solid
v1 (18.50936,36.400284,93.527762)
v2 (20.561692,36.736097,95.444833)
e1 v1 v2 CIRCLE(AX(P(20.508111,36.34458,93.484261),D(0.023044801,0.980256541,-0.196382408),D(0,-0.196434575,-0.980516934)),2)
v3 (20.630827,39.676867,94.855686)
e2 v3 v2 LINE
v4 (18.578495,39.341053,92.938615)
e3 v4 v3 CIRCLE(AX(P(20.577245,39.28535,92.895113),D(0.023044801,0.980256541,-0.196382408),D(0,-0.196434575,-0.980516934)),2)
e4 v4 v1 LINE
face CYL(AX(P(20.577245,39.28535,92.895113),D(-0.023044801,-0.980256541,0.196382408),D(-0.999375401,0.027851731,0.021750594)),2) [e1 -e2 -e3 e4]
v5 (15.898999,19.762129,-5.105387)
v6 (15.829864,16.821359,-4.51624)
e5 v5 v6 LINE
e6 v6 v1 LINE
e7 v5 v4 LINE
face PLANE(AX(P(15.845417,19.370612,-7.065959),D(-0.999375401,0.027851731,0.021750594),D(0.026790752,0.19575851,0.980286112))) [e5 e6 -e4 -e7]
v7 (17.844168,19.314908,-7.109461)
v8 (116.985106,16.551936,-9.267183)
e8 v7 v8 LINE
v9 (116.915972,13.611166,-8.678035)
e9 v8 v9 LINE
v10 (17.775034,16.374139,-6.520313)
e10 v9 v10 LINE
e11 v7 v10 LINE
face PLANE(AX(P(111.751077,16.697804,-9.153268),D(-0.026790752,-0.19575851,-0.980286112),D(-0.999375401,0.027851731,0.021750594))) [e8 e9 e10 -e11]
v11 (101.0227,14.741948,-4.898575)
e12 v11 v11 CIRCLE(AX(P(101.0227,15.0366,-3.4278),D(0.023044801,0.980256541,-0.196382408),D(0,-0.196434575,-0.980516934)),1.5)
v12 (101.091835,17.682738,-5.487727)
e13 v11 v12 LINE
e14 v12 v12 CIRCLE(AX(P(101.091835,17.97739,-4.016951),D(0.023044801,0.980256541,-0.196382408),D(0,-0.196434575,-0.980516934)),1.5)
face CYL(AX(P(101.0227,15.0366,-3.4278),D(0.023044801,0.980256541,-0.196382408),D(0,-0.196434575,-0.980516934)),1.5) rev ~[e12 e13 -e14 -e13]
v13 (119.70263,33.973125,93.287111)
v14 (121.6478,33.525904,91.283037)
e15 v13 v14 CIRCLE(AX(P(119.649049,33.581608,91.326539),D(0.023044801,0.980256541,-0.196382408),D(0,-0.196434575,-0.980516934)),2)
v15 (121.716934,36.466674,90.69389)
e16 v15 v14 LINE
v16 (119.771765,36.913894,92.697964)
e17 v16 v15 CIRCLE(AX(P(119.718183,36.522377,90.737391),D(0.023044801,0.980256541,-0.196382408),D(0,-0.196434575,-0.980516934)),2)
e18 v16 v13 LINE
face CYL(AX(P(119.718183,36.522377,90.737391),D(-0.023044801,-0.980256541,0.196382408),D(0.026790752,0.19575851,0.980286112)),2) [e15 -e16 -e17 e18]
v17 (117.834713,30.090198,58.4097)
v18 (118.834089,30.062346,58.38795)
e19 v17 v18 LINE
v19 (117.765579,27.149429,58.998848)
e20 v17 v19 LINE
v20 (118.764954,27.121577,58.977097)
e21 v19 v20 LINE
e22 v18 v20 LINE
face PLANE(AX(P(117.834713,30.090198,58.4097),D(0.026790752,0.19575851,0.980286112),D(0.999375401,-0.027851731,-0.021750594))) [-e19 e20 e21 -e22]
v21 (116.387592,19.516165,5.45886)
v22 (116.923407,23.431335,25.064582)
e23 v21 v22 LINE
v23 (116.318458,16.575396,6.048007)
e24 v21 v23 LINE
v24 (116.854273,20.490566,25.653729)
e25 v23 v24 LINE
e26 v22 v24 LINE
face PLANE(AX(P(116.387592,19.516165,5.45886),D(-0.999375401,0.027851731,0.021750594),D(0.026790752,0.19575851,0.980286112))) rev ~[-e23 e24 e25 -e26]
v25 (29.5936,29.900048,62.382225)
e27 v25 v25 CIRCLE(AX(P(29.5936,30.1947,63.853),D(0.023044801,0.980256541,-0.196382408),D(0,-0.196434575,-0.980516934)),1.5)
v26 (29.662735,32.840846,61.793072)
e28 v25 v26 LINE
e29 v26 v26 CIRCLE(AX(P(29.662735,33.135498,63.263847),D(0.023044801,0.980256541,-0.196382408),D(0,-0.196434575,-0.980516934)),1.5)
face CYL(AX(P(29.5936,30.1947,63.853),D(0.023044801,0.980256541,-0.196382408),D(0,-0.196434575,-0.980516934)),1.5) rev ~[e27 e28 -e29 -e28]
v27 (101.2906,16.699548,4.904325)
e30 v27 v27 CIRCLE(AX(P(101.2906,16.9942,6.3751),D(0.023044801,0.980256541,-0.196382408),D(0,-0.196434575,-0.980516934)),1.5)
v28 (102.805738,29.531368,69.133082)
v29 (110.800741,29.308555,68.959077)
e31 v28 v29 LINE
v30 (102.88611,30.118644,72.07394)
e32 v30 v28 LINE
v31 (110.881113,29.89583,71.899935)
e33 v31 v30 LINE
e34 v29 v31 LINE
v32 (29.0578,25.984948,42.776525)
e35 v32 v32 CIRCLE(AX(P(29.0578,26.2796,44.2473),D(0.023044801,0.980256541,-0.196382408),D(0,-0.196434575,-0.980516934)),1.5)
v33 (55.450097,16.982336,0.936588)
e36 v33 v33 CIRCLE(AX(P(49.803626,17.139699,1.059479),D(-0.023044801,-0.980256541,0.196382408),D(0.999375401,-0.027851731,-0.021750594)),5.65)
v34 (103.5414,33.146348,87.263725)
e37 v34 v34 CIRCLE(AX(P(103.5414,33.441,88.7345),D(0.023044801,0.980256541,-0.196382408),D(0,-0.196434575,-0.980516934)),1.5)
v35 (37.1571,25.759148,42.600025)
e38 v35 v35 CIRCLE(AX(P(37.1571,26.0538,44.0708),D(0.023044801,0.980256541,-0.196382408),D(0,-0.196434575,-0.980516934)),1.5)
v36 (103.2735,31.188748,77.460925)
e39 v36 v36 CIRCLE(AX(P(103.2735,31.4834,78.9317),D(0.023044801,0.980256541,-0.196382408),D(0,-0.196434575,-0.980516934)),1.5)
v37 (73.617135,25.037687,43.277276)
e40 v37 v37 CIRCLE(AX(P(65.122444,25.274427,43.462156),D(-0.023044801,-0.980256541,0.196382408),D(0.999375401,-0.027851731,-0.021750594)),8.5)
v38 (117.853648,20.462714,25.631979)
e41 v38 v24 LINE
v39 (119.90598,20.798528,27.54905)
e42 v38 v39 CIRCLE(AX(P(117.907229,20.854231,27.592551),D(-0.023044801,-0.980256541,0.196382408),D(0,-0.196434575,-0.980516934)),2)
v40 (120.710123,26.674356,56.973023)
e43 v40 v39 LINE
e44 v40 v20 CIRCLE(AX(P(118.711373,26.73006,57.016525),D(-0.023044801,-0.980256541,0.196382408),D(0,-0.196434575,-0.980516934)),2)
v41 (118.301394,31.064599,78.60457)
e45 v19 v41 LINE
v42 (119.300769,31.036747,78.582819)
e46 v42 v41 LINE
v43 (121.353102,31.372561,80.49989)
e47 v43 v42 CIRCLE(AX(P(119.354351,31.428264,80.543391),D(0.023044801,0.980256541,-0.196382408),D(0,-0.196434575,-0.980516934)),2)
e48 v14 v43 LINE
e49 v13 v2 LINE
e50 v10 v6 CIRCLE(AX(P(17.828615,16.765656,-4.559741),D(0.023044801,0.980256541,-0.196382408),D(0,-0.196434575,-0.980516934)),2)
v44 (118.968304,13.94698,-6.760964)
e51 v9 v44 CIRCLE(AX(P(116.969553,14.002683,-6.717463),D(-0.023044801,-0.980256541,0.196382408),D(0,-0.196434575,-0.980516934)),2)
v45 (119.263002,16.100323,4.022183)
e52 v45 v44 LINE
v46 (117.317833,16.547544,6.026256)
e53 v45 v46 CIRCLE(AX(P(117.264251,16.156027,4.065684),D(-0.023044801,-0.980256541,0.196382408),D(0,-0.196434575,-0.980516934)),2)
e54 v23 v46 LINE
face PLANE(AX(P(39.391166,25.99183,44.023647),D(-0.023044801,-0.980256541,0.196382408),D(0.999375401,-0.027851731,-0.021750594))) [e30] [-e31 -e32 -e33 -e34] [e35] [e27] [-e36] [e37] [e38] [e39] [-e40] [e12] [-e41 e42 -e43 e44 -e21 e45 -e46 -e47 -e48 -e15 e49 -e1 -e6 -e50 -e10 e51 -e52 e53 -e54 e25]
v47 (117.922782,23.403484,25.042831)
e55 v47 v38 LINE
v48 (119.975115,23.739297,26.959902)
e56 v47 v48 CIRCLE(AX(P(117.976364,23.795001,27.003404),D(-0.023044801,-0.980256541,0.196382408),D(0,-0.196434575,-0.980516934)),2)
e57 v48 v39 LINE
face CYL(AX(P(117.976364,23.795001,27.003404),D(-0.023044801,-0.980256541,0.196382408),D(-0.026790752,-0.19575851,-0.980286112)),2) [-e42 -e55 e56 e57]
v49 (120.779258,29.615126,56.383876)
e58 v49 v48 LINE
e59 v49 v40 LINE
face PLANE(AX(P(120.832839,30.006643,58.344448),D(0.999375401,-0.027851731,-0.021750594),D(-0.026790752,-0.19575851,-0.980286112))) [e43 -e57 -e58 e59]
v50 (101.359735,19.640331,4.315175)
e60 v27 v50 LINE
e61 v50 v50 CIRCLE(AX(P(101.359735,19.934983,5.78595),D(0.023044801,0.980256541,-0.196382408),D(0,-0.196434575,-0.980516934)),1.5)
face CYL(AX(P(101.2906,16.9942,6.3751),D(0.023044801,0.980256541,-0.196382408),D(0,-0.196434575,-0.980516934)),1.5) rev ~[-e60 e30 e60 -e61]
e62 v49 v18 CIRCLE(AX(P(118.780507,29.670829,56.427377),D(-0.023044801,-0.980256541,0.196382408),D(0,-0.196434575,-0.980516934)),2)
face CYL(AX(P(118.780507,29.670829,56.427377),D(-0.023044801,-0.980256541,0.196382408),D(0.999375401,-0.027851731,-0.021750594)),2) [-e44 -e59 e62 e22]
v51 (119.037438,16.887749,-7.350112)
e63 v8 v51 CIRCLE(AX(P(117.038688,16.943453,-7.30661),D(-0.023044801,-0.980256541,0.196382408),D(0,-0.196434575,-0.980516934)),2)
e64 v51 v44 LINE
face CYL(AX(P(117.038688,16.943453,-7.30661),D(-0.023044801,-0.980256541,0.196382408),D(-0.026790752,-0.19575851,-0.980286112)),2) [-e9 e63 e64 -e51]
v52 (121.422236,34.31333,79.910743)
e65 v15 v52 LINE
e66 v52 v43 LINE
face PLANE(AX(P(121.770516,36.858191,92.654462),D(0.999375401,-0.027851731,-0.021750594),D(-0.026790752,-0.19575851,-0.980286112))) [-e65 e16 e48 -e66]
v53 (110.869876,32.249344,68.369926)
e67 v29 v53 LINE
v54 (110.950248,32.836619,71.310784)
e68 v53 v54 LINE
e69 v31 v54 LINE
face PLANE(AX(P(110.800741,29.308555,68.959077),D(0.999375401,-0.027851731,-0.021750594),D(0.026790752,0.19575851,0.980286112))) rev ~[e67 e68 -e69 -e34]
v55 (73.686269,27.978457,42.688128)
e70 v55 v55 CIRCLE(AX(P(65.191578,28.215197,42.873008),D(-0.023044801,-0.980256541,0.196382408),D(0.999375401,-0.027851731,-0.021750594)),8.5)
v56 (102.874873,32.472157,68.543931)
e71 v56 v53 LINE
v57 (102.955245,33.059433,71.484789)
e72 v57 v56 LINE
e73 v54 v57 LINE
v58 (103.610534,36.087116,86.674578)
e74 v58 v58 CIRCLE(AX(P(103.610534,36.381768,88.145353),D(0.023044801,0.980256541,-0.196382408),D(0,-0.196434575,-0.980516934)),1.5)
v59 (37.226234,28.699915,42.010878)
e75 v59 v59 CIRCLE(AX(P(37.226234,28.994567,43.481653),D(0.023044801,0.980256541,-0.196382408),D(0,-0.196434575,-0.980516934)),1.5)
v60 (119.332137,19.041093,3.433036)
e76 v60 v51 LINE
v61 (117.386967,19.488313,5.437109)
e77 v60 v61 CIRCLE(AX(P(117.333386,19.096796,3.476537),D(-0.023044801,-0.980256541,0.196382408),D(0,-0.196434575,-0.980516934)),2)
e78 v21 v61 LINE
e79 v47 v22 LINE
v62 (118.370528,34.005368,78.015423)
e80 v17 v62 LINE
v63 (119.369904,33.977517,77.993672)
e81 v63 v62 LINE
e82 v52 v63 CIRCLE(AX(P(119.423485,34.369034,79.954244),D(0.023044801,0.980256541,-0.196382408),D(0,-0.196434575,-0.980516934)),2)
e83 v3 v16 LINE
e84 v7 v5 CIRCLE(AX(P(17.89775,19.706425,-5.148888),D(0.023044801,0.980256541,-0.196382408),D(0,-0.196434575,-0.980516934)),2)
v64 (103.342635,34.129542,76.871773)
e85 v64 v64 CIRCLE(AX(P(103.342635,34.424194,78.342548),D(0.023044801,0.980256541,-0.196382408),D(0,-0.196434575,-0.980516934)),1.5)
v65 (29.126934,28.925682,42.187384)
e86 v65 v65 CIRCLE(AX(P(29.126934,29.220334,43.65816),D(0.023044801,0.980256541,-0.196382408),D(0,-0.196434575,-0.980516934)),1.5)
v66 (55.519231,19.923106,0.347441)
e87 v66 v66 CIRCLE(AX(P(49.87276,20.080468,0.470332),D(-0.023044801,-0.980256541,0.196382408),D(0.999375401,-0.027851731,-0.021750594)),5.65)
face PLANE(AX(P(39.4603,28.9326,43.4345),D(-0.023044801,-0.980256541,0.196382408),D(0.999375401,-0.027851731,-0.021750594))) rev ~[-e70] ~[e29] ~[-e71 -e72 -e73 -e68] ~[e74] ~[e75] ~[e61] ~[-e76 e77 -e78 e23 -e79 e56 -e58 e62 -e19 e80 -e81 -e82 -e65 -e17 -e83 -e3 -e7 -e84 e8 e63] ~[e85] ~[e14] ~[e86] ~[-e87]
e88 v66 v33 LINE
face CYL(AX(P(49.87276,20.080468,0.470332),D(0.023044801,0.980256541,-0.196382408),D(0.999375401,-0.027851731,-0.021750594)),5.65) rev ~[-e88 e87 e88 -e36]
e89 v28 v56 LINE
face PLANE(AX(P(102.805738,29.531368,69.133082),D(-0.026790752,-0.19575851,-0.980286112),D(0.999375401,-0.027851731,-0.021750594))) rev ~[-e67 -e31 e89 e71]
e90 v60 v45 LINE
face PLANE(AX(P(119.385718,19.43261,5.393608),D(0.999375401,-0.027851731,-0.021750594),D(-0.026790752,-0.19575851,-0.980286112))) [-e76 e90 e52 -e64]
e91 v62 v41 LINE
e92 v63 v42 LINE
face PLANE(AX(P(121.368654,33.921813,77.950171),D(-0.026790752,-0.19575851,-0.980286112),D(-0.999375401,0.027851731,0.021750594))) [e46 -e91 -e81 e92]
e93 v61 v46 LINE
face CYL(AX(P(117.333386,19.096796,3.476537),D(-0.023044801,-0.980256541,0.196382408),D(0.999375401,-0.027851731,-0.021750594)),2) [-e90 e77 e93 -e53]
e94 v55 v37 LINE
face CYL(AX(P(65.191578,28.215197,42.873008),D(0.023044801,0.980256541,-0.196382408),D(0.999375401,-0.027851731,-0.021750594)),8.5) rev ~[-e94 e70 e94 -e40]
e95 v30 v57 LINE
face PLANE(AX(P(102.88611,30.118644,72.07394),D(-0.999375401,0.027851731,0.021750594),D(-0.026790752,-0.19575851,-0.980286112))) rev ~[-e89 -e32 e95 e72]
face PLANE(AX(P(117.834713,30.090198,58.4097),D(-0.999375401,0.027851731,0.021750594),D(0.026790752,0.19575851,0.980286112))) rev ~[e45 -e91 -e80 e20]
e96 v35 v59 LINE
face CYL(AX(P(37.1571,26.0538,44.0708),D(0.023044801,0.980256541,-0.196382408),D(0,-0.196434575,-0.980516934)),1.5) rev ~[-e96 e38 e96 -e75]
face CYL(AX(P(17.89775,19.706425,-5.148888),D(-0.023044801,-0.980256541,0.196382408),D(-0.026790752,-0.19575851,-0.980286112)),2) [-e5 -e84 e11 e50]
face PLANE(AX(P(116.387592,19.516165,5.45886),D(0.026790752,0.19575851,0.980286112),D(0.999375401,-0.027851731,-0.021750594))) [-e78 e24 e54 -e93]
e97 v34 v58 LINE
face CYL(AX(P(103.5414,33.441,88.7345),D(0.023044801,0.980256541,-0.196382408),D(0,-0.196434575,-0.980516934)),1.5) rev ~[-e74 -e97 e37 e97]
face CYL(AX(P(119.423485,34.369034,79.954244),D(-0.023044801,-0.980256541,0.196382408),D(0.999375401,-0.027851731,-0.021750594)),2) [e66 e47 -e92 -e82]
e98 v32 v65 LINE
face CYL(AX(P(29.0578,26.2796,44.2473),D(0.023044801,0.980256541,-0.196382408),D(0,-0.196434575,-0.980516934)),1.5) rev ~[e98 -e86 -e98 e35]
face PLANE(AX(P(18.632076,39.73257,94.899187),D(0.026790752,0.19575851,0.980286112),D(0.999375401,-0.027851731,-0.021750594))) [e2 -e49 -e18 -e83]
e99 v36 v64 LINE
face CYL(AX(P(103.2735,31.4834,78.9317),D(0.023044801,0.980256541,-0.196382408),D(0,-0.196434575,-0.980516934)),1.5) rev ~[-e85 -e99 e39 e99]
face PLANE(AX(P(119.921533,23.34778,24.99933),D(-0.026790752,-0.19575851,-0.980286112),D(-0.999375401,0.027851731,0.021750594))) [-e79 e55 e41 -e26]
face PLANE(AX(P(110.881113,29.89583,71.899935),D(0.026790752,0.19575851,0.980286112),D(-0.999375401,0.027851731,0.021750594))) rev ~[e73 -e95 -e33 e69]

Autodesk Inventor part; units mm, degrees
ref_plane "YZ Plane" through (0, 0, 0) normal (1, 0, 0) x (0, 1, 0)
ref_plane "XZ Plane" through (0, 0, 0) normal (0, 1, 0) x (-1, 0, 0)
ref_plane "Plano de trabajo1" through (39.4603, 28.9326, 43.4345) normal (-0.0230448, -0.9802565, 0.1963824) x (0.9993754, -0.0278517, -0.0217506)
sketch "Boceto1" plane through (39.4603, 28.9326, 43.4345) normal (-0.0230448, -0.9802565, 0.1963824) x (0.9993754, -0.0278517, -0.0217506)
  circle A0 centre (25.7474, -0.0015) radius 6 construction
  circle A1 centre (25.7474, -0.0015) radius 8.5 construction
  circle A2 centre (25.7474, -0.0015) radius 8.5
  line L0 (73.7302, -52.0094) -> (-22.2354, -52.0094)
  line L1 (-22.2354, -52.0094) -> (-22.2354, 52.0063)
  line L2 (-22.2354, 52.0063) -> (73.7302, 52.0063)
  line L3 (73.7302, 52.0063) -> (73.7302, -52.0094)
  line L4 (73.7302, -52.0094) -> (-22.2354, 52.0063) construction
  line L5 (-22.2354, -52.0094) -> (73.7302, 52.0063) construction
  line L6 (18.0272, 52.0081) -> (-18.0728, 52.0046) construction
  line L7 (73.7311, 10.0133) -> (73.7292, 30.0133) construction
  circle A3 centre (11.587, -43.5711) radius 5.65 construction
  circle A4 centre (11.587, -43.5711) radius 5.65
  line L8 (77.9675, -50.0094) -> (77.9675, 50.0063) projected
  line L9 (73.7302, 52.0063) -> (77.9675, 52.0063)
  line L10 (77.9675, 52.0063) -> (77.9675, -52.0094)
  line L11 (77.9675, -52.0094) -> (73.7302, -52.0094)
  line L12 (73.7302, -52.0094) -> (73.7302, 52.0063)
  line L13 (77.9675, 17.0063) -> (74.9675, 17.0063) projected
  line L14 (77.9675, 37.0063) -> (74.9675, 37.0063) projected
  line L15 (77.9675, -37.0094) -> (74.9675, -37.0094) projected
  line L16 (77.9675, -17.0094) -> (74.9675, -17.0094) projected
  line L17 (77.9675, -37.0094) -> (73.7302, -37.0094)
  line L18 (73.7302, -37.0094) -> (73.7302, -17.0094)
  line L19 (73.7302, -17.0094) -> (77.9675, -17.0094)
  line L20 (77.9675, -17.0094) -> (77.9675, -37.0094)
  line L21 (77.9675, 17.0063) -> (73.7302, 17.0063)
  line L22 (73.7302, 17.0063) -> (73.7302, 37.0063)
  line L23 (73.7302, 37.0063) -> (77.9675, 37.0063)
  line L24 (77.9675, 37.0063) -> (77.9675, 17.0063)
  line L25 (77.9675, 52.0063) -> (80.9675, 52.0063)
  line L26 (80.9675, 52.0063) -> (80.9675, 37.0063)
  line L27 (80.9675, 37.0063) -> (77.9675, 37.0063)
  line L28 (77.9675, 37.0063) -> (77.9675, 52.0063)
  line L29 (77.9675, 17.0063) -> (80.9675, 17.0063)
  line L30 (80.9675, 17.0063) -> (80.9675, -17.0094)
  line L31 (80.9675, -17.0094) -> (77.9675, -17.0094)
  line L32 (77.9675, -17.0094) -> (77.9675, 17.0063)
  line L33 (77.9675, -37.0094) -> (80.9675, -37.0094)
  line L34 (80.9675, -37.0094) -> (80.9675, -52.0094)
  line L35 (80.9675, -52.0094) -> (77.9675, -52.0094)
  line L36 (77.9675, -52.0094) -> (77.9675, -37.0094)
  point P0 (-37.6851, -49.2992)
  point P1 (73.7302, 20.0133)
  point P2 (-0.0228, 52.0063)
  point P3 (77.9675, -0.0015)
  point P4 (76.4675, -17.0094)
  point P5 (77.9675, -50.0094)
  point P6 (74.9675, -37.0094)
  point P7 (74.9675, 17.0063)
  point P8 (73.7302, 17.0063)
  point P9 (73.7302, -17.0094)
  point P10 (74.9675, -17.0094)
  point P11 (73.7302, 37.0063)
  point P12 (74.9675, 37.0063)
  point P13 (77.9675, 50.0063)
  point P14 (77.9675, -52.0094)
  point P15 (77.9675, -17.0094)
  point P16 (77.9675, 37.0063)
  dimension "d33" = 3
extrude "Extrusión1" add sketch "Boceto1" along normal blind 3
sketch "Boceto3" plane through (39.3912, 25.9918, 44.0236) normal (-0.0230448, -0.9802565, 0.1963824) x (0.9993754, -0.0278517, -0.0217506)
  line L0 (44.9302, -50.0094) -> (44.9302, 50.0063) construction
  line L1 (47.9302, -50.0094) -> (47.9302, 50.0063) construction
  line L2 (44.9302, 37.0063) -> (47.9302, 37.0063)
  line L3 (47.9302, 37.0063) -> (47.9302, 17.0063)
  line L4 (47.9302, 17.0063) -> (44.9302, 17.0063)
  line L5 (44.9302, 17.0063) -> (44.9302, 37.0063)
  line L6 (73.7302, 52.0063) -> (-22.2354, 52.0063) construction
  line L7 (44.9302, -17.0094) -> (47.9302, -17.0094)
  line L8 (47.9302, -17.0094) -> (47.9302, -37.0094)
  line L9 (47.9302, -37.0094) -> (44.9302, -37.0094)
  line L10 (44.9302, -37.0094) -> (44.9302, -17.0094)
  line L11 (-22.2354, -52.0094) -> (73.7302, -52.0094) construction
  point P0 (-37.6851, -49.2992)
  point P1 (-22.2354, 52.0063)
  point P2 (-22.2354, -52.0094)
  point P3 (73.7302, -52.0094)
  point P4 (46.4302, -37.0094)
  dimension "d2" = 20
  dimension "d3" = 15
  dimension "d4" = 15
  dimension "d5" = 20
extrude "Extrusión2" [suppressed]
sketch "Boceto4" plane through (39.3912, 25.9918, 44.0236) normal (-0.0230448, -0.9802565, 0.1963824) x (0.9993754, -0.0278517, -0.0217506)
  circle A0 centre (62.9302, -47.0094) radius 1.6 construction
  circle A1 centre (62.9302, -37.0094) radius 1.6 construction
  circle A2 centre (62.9302, 37.0063) radius 1.6 construction
  circle A3 centre (62.9302, 47.0063) radius 1.6 construction
  point P0 (-37.6851, -49.2992)
hole "Agujero1" at (101.0227, 15.0366, -3.4278) at (101.2906, 16.9942, 6.3751) at (103.2735, 31.4834, 78.9317) at (103.5414, 33.441, 88.7345) direction (0.0230448, 0.9802565, -0.1963824) diameter 3 end through all
sketch "Boceto5" plane through (39.3912, 25.9918, 44.0236) normal (-0.0230448, -0.9802565, 0.1963824) x (0.9993754, -0.0278517, -0.0217506)
  line L0 (-22.2354, 52.0063) -> (-22.2354, -52.0094) construction
  line L1 (-22.2354, -52.0094) -> (73.7302, -52.0094) construction
  circle A0 centre (-10.3398, 19.9988) radius 1.6 construction
  circle A1 centre (-10.3398, -0.0012) radius 1.6 construction
  point P0 (-37.6851, -49.2992)
  point P1 (-2.2354, -0.0015)
  point P2 (-22.2354, -0.0015)
  dimension "d16" = 20
  dimension "d18" = 0
hole "Agujero2" at (37.1571, 26.0538, 44.0708) at (29.5936, 30.1947, 63.853) at (29.0578, 26.2796, 44.2473) direction (0.0230448, 0.9802565, -0.1963824) diameter 3 end through all
sketch "Boceto6" plane through (39.3912, 25.9918, 44.0236) normal (-0.0230448, -0.9802565, 0.1963824) x (0.9993754, -0.0278517, -0.0217506)
  line L0 (70.7302, 30.0063) -> (62.7302, 30.0063)
  line L1 (62.7302, 30.0063) -> (62.7302, 27.0063)
  line L2 (62.7302, 27.0063) -> (70.7302, 27.0063)
  line L3 (70.7302, 27.0063) -> (70.7302, 30.0063)
  line L4 (70.7302, 30.0063) -> (62.7302, 27.0063) construction
  line L5 (62.7302, 30.0063) -> (70.7302, 27.0063) construction
  line L6 (73.7302, 17.0063) -> (73.7302, 37.0063) construction
  line L7 (73.7302, 52.0063) -> (-22.2354, 52.0063) construction
  point P0 (-37.6851, -49.2992)
  point P1 (66.7302, 28.5063)
  point P2 (73.7302, -52.0094)
  point P3 (70.7302, 28.5063)
  dimension "d26" = 8
  dimension "d27" = 3
  dimension "d28" = 3
  dimension "d29" = 22
extrude "Extrusión3" cut sketch "Boceto6" against normal through all
fillet "Empalme1" radius 2 8 edges at (18.5975, 38.2622, 95.1938) (15.8108, 17.9002, -6.7714) (121.736, 35.3878, 92.9491) (121.3341, 32.4514, 78.2448) (120.7983, 28.5363, 58.6391) (119.887, 21.8774, 25.2939) (119.3512, 17.9622, 5.6882) (118.9493, 15.0258, -9.0161)
properties part number "BaseMotoJose"
